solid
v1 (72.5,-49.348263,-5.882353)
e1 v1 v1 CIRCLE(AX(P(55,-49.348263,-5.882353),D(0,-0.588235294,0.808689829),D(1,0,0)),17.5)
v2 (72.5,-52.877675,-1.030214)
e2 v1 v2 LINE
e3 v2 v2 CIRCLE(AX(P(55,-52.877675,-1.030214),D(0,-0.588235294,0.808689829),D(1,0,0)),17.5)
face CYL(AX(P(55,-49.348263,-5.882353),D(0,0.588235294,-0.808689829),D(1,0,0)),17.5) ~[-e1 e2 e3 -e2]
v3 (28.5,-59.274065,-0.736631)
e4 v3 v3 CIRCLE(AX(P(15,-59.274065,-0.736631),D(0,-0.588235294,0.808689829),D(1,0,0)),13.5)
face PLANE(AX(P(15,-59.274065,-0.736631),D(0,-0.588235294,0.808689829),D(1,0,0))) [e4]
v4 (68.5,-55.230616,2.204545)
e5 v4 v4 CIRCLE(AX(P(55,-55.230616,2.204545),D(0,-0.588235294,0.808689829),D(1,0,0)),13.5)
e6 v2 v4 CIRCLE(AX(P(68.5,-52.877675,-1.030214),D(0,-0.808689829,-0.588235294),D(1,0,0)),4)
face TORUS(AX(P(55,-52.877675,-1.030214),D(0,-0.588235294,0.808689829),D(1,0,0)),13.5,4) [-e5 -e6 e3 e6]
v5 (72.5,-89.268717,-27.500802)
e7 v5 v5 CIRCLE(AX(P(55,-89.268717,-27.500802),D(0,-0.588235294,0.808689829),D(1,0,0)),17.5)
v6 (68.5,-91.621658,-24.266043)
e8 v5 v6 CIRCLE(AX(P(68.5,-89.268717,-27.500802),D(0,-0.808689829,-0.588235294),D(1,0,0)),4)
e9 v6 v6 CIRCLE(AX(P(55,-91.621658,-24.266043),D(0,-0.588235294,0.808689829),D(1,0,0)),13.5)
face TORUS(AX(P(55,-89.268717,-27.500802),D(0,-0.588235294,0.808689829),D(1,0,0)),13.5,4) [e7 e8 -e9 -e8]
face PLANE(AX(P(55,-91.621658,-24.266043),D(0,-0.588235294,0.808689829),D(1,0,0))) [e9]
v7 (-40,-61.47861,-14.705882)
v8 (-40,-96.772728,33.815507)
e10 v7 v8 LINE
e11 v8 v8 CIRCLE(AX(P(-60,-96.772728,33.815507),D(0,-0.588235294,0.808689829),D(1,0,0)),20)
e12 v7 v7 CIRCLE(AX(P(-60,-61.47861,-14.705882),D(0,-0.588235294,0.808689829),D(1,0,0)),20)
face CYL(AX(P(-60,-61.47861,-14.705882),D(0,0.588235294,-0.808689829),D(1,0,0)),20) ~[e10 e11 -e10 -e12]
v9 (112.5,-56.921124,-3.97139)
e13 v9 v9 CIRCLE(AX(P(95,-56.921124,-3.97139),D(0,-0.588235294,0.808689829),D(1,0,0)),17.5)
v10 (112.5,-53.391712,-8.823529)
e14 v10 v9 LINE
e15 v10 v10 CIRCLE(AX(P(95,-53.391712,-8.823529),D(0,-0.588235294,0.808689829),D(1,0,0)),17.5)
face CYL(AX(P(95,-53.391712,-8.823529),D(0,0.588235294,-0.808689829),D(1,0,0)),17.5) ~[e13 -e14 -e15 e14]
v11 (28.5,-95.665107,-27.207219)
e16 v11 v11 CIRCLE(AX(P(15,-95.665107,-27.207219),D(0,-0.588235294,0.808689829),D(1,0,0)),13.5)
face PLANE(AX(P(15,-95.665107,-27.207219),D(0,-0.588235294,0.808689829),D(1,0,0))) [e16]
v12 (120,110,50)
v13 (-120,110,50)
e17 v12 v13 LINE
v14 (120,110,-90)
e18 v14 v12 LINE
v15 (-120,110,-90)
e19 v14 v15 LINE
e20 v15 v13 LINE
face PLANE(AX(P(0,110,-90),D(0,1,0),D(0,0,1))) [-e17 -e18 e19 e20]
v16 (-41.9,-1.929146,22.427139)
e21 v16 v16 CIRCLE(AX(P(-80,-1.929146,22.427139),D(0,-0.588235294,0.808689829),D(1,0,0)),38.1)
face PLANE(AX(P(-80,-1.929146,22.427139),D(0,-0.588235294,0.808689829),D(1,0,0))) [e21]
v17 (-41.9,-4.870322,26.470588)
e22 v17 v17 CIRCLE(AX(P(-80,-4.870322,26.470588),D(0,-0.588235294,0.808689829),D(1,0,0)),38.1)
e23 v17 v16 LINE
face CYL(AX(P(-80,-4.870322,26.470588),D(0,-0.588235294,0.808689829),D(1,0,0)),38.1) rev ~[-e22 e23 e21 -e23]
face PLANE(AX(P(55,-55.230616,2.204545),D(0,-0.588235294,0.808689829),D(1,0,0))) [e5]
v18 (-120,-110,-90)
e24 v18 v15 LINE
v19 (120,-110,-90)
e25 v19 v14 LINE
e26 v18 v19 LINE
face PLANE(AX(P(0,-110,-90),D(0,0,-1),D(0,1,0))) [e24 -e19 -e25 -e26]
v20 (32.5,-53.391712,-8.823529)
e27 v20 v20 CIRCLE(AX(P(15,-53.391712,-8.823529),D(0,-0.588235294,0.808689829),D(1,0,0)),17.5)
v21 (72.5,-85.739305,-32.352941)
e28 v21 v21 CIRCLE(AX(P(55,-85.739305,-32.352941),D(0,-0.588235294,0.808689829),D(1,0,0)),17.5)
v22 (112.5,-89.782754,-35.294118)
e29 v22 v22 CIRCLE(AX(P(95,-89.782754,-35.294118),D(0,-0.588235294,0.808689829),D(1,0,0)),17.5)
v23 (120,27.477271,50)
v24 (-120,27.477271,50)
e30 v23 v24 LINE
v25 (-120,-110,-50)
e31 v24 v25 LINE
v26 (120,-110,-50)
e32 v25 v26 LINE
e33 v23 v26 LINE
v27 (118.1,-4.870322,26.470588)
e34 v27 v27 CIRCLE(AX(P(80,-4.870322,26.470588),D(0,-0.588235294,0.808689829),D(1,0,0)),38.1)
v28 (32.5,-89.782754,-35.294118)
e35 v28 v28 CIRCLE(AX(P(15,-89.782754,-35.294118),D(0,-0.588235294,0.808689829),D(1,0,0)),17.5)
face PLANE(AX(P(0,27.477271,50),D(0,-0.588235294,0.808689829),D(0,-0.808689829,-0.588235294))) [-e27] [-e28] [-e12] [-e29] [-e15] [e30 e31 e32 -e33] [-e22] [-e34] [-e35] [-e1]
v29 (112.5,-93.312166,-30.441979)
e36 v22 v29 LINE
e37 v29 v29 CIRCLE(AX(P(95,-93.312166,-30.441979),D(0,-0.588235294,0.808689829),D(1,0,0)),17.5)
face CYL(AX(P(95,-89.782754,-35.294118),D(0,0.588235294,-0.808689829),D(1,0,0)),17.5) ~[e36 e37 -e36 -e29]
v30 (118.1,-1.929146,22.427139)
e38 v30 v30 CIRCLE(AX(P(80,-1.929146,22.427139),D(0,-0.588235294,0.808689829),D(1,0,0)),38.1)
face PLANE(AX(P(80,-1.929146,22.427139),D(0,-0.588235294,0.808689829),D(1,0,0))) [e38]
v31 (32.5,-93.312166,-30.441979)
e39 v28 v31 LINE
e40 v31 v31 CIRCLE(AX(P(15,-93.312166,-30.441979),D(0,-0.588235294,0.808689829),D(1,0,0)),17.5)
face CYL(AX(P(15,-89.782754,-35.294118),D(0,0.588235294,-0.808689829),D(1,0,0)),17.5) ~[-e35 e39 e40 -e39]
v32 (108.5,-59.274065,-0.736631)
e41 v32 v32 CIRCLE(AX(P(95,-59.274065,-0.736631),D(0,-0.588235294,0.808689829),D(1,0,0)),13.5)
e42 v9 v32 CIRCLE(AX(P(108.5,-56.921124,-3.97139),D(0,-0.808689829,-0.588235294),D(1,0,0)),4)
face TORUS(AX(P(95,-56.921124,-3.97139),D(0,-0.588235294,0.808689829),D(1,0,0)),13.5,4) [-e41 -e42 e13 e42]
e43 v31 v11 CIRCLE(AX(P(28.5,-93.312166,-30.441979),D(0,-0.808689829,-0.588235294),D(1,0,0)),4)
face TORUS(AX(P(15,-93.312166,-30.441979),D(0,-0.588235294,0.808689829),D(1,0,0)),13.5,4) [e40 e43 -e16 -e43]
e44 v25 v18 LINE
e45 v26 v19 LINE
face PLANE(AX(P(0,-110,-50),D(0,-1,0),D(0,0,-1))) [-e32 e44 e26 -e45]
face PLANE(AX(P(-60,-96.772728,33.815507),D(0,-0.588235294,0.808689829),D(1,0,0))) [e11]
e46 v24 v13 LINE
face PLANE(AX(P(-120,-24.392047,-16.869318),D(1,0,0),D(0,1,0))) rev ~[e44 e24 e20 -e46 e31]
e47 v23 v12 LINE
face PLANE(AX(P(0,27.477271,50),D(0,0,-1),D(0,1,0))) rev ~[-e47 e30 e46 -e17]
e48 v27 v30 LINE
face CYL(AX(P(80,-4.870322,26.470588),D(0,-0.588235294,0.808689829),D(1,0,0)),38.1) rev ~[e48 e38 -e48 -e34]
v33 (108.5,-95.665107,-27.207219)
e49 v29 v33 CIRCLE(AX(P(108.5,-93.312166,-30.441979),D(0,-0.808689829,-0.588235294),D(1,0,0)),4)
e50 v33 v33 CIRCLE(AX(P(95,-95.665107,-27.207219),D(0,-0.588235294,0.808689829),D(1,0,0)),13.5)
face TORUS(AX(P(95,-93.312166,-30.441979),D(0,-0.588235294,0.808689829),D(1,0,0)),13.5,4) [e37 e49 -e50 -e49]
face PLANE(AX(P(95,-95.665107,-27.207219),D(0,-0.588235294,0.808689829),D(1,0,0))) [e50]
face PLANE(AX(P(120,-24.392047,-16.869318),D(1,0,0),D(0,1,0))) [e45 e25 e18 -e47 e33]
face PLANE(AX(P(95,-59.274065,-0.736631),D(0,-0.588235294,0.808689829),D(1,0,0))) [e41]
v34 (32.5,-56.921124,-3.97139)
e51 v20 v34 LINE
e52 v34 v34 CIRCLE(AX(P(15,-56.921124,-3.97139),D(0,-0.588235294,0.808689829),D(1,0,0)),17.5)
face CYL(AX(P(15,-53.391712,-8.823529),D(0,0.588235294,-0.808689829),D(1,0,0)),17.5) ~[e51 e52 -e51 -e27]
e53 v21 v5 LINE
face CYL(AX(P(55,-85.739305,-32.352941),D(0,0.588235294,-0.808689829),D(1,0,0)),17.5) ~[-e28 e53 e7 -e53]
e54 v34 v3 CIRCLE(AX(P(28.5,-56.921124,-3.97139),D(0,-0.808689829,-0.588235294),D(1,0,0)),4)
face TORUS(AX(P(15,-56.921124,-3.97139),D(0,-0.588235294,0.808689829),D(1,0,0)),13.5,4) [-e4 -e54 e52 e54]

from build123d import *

# Parameters (mm, degrees)
F0_W     = 82.5227291513
F0_H     = 100
F1_DEPTH = 120
F2_R     = 38.1
F3_DEPTH = 5
F4_DEPTH = 5
F2_R_2   = 17.5
F5_DEPTH = 10
F6_DEPTH = 10
F2_R_3   = 20
F7_DEPTH = 60
F8_R     = 4
F9_R     = 4


# Not quite as in the source:
# - the program builds the solid bodies; features that only make, move or delete a surface that nothing else refers to are left out


with BuildPart() as f1:
    # F0 (on Right) → F1 (new body, symmetric)
    with BuildSketch(Plane.YZ):
        Polygon((27.4772708487, -50), (27.4772708487, 50), (-110, -50), align=None)
        with Locations((68.7386354243, 0)):
            Rectangle(F0_W, F0_H)
        Polygon((27.4772708487, -50), (-110, -50), (-110, -90), (110, -90), (110, -50), align=None)
    extrude(amount=F1_DEPTH, both=True)

    # F2 (on face) → F3 (cut)
    with BuildSketch(Plane(origin=(0, -14.2772887805, 19.6280269666), x_dir=(1, 0, 0), z_dir=(0, -0.5882352941, 0.8086898285))):
        with Locations((-80, 11.6323541567)):
            Circle(F2_R)
    extrude(amount=-F3_DEPTH, mode=Mode.SUBTRACT)

    # F2 (on face) → F4 (cut)
    with BuildSketch(Plane(origin=(0, -14.2772887805, 19.6280269666), x_dir=(1, 0, 0), z_dir=(0, -0.5882352941, 0.8086898285))):
        with Locations((80, 11.6323541567)):
            Circle(F2_R)
    extrude(amount=-F4_DEPTH, mode=Mode.SUBTRACT)

    # F2 (on face) → F5 (join)
    with BuildSketch(Plane(origin=(0, -14.2772887805, 19.6280269666), x_dir=(1, 0, 0), z_dir=(0, -0.5882352941, 0.8086898285))):
        with Locations((15, -48.3676458433)):
            Circle(F2_R_2)
    extrude(amount=F5_DEPTH)

    # F2 (on face) → F6 (join)
    with BuildSketch(Plane(origin=(0, -14.2772887805, 19.6280269666), x_dir=(1, 0, 0), z_dir=(0, -0.5882352941, 0.8086898285))):
        with Locations((15, -93.3676458433)):
            Circle(F2_R_2)
        with Locations((55, -43.3676458433)):
            Circle(F2_R_2)
        with Locations((55, -88.3676458433)):
            Circle(F2_R_2)
        with Locations((95, -48.3676458433)):
            Circle(F2_R_2)
        with Locations((95, -93.3676458433)):
            Circle(F2_R_2)
    extrude(amount=F6_DEPTH)

    # F2 (on face) → F7 (join)
    with BuildSketch(Plane(origin=(0, -14.2772887805, 19.6280269666), x_dir=(1, 0, 0), z_dir=(0, -0.5882352941, 0.8086898285))):
        with Locations((-60, -58.3676458433)):
            Circle(F2_R_3)
    extrude(amount=F7_DEPTH)

    # F8
    f8_edges = [f1.edges().sort_by_distance(p)[0] for p in [
        (-2.5, -59.274065, -0.736631),
    ]]
    fillet(f8_edges, radius=F8_R)

    # F9
    f9_edges = [f1.edges().sort_by_distance(p)[0] for p in [
        (37.5, -55.230616, 2.204545),
        (77.5, -59.274065, -0.736631),
        (77.5, -95.665107, -27.207219),
        (37.5, -91.621658, -24.266043),
        (-2.5, -95.665107, -27.207219),
    ]]
    fillet(f9_edges, radius=F9_R)


solid = f1.part
